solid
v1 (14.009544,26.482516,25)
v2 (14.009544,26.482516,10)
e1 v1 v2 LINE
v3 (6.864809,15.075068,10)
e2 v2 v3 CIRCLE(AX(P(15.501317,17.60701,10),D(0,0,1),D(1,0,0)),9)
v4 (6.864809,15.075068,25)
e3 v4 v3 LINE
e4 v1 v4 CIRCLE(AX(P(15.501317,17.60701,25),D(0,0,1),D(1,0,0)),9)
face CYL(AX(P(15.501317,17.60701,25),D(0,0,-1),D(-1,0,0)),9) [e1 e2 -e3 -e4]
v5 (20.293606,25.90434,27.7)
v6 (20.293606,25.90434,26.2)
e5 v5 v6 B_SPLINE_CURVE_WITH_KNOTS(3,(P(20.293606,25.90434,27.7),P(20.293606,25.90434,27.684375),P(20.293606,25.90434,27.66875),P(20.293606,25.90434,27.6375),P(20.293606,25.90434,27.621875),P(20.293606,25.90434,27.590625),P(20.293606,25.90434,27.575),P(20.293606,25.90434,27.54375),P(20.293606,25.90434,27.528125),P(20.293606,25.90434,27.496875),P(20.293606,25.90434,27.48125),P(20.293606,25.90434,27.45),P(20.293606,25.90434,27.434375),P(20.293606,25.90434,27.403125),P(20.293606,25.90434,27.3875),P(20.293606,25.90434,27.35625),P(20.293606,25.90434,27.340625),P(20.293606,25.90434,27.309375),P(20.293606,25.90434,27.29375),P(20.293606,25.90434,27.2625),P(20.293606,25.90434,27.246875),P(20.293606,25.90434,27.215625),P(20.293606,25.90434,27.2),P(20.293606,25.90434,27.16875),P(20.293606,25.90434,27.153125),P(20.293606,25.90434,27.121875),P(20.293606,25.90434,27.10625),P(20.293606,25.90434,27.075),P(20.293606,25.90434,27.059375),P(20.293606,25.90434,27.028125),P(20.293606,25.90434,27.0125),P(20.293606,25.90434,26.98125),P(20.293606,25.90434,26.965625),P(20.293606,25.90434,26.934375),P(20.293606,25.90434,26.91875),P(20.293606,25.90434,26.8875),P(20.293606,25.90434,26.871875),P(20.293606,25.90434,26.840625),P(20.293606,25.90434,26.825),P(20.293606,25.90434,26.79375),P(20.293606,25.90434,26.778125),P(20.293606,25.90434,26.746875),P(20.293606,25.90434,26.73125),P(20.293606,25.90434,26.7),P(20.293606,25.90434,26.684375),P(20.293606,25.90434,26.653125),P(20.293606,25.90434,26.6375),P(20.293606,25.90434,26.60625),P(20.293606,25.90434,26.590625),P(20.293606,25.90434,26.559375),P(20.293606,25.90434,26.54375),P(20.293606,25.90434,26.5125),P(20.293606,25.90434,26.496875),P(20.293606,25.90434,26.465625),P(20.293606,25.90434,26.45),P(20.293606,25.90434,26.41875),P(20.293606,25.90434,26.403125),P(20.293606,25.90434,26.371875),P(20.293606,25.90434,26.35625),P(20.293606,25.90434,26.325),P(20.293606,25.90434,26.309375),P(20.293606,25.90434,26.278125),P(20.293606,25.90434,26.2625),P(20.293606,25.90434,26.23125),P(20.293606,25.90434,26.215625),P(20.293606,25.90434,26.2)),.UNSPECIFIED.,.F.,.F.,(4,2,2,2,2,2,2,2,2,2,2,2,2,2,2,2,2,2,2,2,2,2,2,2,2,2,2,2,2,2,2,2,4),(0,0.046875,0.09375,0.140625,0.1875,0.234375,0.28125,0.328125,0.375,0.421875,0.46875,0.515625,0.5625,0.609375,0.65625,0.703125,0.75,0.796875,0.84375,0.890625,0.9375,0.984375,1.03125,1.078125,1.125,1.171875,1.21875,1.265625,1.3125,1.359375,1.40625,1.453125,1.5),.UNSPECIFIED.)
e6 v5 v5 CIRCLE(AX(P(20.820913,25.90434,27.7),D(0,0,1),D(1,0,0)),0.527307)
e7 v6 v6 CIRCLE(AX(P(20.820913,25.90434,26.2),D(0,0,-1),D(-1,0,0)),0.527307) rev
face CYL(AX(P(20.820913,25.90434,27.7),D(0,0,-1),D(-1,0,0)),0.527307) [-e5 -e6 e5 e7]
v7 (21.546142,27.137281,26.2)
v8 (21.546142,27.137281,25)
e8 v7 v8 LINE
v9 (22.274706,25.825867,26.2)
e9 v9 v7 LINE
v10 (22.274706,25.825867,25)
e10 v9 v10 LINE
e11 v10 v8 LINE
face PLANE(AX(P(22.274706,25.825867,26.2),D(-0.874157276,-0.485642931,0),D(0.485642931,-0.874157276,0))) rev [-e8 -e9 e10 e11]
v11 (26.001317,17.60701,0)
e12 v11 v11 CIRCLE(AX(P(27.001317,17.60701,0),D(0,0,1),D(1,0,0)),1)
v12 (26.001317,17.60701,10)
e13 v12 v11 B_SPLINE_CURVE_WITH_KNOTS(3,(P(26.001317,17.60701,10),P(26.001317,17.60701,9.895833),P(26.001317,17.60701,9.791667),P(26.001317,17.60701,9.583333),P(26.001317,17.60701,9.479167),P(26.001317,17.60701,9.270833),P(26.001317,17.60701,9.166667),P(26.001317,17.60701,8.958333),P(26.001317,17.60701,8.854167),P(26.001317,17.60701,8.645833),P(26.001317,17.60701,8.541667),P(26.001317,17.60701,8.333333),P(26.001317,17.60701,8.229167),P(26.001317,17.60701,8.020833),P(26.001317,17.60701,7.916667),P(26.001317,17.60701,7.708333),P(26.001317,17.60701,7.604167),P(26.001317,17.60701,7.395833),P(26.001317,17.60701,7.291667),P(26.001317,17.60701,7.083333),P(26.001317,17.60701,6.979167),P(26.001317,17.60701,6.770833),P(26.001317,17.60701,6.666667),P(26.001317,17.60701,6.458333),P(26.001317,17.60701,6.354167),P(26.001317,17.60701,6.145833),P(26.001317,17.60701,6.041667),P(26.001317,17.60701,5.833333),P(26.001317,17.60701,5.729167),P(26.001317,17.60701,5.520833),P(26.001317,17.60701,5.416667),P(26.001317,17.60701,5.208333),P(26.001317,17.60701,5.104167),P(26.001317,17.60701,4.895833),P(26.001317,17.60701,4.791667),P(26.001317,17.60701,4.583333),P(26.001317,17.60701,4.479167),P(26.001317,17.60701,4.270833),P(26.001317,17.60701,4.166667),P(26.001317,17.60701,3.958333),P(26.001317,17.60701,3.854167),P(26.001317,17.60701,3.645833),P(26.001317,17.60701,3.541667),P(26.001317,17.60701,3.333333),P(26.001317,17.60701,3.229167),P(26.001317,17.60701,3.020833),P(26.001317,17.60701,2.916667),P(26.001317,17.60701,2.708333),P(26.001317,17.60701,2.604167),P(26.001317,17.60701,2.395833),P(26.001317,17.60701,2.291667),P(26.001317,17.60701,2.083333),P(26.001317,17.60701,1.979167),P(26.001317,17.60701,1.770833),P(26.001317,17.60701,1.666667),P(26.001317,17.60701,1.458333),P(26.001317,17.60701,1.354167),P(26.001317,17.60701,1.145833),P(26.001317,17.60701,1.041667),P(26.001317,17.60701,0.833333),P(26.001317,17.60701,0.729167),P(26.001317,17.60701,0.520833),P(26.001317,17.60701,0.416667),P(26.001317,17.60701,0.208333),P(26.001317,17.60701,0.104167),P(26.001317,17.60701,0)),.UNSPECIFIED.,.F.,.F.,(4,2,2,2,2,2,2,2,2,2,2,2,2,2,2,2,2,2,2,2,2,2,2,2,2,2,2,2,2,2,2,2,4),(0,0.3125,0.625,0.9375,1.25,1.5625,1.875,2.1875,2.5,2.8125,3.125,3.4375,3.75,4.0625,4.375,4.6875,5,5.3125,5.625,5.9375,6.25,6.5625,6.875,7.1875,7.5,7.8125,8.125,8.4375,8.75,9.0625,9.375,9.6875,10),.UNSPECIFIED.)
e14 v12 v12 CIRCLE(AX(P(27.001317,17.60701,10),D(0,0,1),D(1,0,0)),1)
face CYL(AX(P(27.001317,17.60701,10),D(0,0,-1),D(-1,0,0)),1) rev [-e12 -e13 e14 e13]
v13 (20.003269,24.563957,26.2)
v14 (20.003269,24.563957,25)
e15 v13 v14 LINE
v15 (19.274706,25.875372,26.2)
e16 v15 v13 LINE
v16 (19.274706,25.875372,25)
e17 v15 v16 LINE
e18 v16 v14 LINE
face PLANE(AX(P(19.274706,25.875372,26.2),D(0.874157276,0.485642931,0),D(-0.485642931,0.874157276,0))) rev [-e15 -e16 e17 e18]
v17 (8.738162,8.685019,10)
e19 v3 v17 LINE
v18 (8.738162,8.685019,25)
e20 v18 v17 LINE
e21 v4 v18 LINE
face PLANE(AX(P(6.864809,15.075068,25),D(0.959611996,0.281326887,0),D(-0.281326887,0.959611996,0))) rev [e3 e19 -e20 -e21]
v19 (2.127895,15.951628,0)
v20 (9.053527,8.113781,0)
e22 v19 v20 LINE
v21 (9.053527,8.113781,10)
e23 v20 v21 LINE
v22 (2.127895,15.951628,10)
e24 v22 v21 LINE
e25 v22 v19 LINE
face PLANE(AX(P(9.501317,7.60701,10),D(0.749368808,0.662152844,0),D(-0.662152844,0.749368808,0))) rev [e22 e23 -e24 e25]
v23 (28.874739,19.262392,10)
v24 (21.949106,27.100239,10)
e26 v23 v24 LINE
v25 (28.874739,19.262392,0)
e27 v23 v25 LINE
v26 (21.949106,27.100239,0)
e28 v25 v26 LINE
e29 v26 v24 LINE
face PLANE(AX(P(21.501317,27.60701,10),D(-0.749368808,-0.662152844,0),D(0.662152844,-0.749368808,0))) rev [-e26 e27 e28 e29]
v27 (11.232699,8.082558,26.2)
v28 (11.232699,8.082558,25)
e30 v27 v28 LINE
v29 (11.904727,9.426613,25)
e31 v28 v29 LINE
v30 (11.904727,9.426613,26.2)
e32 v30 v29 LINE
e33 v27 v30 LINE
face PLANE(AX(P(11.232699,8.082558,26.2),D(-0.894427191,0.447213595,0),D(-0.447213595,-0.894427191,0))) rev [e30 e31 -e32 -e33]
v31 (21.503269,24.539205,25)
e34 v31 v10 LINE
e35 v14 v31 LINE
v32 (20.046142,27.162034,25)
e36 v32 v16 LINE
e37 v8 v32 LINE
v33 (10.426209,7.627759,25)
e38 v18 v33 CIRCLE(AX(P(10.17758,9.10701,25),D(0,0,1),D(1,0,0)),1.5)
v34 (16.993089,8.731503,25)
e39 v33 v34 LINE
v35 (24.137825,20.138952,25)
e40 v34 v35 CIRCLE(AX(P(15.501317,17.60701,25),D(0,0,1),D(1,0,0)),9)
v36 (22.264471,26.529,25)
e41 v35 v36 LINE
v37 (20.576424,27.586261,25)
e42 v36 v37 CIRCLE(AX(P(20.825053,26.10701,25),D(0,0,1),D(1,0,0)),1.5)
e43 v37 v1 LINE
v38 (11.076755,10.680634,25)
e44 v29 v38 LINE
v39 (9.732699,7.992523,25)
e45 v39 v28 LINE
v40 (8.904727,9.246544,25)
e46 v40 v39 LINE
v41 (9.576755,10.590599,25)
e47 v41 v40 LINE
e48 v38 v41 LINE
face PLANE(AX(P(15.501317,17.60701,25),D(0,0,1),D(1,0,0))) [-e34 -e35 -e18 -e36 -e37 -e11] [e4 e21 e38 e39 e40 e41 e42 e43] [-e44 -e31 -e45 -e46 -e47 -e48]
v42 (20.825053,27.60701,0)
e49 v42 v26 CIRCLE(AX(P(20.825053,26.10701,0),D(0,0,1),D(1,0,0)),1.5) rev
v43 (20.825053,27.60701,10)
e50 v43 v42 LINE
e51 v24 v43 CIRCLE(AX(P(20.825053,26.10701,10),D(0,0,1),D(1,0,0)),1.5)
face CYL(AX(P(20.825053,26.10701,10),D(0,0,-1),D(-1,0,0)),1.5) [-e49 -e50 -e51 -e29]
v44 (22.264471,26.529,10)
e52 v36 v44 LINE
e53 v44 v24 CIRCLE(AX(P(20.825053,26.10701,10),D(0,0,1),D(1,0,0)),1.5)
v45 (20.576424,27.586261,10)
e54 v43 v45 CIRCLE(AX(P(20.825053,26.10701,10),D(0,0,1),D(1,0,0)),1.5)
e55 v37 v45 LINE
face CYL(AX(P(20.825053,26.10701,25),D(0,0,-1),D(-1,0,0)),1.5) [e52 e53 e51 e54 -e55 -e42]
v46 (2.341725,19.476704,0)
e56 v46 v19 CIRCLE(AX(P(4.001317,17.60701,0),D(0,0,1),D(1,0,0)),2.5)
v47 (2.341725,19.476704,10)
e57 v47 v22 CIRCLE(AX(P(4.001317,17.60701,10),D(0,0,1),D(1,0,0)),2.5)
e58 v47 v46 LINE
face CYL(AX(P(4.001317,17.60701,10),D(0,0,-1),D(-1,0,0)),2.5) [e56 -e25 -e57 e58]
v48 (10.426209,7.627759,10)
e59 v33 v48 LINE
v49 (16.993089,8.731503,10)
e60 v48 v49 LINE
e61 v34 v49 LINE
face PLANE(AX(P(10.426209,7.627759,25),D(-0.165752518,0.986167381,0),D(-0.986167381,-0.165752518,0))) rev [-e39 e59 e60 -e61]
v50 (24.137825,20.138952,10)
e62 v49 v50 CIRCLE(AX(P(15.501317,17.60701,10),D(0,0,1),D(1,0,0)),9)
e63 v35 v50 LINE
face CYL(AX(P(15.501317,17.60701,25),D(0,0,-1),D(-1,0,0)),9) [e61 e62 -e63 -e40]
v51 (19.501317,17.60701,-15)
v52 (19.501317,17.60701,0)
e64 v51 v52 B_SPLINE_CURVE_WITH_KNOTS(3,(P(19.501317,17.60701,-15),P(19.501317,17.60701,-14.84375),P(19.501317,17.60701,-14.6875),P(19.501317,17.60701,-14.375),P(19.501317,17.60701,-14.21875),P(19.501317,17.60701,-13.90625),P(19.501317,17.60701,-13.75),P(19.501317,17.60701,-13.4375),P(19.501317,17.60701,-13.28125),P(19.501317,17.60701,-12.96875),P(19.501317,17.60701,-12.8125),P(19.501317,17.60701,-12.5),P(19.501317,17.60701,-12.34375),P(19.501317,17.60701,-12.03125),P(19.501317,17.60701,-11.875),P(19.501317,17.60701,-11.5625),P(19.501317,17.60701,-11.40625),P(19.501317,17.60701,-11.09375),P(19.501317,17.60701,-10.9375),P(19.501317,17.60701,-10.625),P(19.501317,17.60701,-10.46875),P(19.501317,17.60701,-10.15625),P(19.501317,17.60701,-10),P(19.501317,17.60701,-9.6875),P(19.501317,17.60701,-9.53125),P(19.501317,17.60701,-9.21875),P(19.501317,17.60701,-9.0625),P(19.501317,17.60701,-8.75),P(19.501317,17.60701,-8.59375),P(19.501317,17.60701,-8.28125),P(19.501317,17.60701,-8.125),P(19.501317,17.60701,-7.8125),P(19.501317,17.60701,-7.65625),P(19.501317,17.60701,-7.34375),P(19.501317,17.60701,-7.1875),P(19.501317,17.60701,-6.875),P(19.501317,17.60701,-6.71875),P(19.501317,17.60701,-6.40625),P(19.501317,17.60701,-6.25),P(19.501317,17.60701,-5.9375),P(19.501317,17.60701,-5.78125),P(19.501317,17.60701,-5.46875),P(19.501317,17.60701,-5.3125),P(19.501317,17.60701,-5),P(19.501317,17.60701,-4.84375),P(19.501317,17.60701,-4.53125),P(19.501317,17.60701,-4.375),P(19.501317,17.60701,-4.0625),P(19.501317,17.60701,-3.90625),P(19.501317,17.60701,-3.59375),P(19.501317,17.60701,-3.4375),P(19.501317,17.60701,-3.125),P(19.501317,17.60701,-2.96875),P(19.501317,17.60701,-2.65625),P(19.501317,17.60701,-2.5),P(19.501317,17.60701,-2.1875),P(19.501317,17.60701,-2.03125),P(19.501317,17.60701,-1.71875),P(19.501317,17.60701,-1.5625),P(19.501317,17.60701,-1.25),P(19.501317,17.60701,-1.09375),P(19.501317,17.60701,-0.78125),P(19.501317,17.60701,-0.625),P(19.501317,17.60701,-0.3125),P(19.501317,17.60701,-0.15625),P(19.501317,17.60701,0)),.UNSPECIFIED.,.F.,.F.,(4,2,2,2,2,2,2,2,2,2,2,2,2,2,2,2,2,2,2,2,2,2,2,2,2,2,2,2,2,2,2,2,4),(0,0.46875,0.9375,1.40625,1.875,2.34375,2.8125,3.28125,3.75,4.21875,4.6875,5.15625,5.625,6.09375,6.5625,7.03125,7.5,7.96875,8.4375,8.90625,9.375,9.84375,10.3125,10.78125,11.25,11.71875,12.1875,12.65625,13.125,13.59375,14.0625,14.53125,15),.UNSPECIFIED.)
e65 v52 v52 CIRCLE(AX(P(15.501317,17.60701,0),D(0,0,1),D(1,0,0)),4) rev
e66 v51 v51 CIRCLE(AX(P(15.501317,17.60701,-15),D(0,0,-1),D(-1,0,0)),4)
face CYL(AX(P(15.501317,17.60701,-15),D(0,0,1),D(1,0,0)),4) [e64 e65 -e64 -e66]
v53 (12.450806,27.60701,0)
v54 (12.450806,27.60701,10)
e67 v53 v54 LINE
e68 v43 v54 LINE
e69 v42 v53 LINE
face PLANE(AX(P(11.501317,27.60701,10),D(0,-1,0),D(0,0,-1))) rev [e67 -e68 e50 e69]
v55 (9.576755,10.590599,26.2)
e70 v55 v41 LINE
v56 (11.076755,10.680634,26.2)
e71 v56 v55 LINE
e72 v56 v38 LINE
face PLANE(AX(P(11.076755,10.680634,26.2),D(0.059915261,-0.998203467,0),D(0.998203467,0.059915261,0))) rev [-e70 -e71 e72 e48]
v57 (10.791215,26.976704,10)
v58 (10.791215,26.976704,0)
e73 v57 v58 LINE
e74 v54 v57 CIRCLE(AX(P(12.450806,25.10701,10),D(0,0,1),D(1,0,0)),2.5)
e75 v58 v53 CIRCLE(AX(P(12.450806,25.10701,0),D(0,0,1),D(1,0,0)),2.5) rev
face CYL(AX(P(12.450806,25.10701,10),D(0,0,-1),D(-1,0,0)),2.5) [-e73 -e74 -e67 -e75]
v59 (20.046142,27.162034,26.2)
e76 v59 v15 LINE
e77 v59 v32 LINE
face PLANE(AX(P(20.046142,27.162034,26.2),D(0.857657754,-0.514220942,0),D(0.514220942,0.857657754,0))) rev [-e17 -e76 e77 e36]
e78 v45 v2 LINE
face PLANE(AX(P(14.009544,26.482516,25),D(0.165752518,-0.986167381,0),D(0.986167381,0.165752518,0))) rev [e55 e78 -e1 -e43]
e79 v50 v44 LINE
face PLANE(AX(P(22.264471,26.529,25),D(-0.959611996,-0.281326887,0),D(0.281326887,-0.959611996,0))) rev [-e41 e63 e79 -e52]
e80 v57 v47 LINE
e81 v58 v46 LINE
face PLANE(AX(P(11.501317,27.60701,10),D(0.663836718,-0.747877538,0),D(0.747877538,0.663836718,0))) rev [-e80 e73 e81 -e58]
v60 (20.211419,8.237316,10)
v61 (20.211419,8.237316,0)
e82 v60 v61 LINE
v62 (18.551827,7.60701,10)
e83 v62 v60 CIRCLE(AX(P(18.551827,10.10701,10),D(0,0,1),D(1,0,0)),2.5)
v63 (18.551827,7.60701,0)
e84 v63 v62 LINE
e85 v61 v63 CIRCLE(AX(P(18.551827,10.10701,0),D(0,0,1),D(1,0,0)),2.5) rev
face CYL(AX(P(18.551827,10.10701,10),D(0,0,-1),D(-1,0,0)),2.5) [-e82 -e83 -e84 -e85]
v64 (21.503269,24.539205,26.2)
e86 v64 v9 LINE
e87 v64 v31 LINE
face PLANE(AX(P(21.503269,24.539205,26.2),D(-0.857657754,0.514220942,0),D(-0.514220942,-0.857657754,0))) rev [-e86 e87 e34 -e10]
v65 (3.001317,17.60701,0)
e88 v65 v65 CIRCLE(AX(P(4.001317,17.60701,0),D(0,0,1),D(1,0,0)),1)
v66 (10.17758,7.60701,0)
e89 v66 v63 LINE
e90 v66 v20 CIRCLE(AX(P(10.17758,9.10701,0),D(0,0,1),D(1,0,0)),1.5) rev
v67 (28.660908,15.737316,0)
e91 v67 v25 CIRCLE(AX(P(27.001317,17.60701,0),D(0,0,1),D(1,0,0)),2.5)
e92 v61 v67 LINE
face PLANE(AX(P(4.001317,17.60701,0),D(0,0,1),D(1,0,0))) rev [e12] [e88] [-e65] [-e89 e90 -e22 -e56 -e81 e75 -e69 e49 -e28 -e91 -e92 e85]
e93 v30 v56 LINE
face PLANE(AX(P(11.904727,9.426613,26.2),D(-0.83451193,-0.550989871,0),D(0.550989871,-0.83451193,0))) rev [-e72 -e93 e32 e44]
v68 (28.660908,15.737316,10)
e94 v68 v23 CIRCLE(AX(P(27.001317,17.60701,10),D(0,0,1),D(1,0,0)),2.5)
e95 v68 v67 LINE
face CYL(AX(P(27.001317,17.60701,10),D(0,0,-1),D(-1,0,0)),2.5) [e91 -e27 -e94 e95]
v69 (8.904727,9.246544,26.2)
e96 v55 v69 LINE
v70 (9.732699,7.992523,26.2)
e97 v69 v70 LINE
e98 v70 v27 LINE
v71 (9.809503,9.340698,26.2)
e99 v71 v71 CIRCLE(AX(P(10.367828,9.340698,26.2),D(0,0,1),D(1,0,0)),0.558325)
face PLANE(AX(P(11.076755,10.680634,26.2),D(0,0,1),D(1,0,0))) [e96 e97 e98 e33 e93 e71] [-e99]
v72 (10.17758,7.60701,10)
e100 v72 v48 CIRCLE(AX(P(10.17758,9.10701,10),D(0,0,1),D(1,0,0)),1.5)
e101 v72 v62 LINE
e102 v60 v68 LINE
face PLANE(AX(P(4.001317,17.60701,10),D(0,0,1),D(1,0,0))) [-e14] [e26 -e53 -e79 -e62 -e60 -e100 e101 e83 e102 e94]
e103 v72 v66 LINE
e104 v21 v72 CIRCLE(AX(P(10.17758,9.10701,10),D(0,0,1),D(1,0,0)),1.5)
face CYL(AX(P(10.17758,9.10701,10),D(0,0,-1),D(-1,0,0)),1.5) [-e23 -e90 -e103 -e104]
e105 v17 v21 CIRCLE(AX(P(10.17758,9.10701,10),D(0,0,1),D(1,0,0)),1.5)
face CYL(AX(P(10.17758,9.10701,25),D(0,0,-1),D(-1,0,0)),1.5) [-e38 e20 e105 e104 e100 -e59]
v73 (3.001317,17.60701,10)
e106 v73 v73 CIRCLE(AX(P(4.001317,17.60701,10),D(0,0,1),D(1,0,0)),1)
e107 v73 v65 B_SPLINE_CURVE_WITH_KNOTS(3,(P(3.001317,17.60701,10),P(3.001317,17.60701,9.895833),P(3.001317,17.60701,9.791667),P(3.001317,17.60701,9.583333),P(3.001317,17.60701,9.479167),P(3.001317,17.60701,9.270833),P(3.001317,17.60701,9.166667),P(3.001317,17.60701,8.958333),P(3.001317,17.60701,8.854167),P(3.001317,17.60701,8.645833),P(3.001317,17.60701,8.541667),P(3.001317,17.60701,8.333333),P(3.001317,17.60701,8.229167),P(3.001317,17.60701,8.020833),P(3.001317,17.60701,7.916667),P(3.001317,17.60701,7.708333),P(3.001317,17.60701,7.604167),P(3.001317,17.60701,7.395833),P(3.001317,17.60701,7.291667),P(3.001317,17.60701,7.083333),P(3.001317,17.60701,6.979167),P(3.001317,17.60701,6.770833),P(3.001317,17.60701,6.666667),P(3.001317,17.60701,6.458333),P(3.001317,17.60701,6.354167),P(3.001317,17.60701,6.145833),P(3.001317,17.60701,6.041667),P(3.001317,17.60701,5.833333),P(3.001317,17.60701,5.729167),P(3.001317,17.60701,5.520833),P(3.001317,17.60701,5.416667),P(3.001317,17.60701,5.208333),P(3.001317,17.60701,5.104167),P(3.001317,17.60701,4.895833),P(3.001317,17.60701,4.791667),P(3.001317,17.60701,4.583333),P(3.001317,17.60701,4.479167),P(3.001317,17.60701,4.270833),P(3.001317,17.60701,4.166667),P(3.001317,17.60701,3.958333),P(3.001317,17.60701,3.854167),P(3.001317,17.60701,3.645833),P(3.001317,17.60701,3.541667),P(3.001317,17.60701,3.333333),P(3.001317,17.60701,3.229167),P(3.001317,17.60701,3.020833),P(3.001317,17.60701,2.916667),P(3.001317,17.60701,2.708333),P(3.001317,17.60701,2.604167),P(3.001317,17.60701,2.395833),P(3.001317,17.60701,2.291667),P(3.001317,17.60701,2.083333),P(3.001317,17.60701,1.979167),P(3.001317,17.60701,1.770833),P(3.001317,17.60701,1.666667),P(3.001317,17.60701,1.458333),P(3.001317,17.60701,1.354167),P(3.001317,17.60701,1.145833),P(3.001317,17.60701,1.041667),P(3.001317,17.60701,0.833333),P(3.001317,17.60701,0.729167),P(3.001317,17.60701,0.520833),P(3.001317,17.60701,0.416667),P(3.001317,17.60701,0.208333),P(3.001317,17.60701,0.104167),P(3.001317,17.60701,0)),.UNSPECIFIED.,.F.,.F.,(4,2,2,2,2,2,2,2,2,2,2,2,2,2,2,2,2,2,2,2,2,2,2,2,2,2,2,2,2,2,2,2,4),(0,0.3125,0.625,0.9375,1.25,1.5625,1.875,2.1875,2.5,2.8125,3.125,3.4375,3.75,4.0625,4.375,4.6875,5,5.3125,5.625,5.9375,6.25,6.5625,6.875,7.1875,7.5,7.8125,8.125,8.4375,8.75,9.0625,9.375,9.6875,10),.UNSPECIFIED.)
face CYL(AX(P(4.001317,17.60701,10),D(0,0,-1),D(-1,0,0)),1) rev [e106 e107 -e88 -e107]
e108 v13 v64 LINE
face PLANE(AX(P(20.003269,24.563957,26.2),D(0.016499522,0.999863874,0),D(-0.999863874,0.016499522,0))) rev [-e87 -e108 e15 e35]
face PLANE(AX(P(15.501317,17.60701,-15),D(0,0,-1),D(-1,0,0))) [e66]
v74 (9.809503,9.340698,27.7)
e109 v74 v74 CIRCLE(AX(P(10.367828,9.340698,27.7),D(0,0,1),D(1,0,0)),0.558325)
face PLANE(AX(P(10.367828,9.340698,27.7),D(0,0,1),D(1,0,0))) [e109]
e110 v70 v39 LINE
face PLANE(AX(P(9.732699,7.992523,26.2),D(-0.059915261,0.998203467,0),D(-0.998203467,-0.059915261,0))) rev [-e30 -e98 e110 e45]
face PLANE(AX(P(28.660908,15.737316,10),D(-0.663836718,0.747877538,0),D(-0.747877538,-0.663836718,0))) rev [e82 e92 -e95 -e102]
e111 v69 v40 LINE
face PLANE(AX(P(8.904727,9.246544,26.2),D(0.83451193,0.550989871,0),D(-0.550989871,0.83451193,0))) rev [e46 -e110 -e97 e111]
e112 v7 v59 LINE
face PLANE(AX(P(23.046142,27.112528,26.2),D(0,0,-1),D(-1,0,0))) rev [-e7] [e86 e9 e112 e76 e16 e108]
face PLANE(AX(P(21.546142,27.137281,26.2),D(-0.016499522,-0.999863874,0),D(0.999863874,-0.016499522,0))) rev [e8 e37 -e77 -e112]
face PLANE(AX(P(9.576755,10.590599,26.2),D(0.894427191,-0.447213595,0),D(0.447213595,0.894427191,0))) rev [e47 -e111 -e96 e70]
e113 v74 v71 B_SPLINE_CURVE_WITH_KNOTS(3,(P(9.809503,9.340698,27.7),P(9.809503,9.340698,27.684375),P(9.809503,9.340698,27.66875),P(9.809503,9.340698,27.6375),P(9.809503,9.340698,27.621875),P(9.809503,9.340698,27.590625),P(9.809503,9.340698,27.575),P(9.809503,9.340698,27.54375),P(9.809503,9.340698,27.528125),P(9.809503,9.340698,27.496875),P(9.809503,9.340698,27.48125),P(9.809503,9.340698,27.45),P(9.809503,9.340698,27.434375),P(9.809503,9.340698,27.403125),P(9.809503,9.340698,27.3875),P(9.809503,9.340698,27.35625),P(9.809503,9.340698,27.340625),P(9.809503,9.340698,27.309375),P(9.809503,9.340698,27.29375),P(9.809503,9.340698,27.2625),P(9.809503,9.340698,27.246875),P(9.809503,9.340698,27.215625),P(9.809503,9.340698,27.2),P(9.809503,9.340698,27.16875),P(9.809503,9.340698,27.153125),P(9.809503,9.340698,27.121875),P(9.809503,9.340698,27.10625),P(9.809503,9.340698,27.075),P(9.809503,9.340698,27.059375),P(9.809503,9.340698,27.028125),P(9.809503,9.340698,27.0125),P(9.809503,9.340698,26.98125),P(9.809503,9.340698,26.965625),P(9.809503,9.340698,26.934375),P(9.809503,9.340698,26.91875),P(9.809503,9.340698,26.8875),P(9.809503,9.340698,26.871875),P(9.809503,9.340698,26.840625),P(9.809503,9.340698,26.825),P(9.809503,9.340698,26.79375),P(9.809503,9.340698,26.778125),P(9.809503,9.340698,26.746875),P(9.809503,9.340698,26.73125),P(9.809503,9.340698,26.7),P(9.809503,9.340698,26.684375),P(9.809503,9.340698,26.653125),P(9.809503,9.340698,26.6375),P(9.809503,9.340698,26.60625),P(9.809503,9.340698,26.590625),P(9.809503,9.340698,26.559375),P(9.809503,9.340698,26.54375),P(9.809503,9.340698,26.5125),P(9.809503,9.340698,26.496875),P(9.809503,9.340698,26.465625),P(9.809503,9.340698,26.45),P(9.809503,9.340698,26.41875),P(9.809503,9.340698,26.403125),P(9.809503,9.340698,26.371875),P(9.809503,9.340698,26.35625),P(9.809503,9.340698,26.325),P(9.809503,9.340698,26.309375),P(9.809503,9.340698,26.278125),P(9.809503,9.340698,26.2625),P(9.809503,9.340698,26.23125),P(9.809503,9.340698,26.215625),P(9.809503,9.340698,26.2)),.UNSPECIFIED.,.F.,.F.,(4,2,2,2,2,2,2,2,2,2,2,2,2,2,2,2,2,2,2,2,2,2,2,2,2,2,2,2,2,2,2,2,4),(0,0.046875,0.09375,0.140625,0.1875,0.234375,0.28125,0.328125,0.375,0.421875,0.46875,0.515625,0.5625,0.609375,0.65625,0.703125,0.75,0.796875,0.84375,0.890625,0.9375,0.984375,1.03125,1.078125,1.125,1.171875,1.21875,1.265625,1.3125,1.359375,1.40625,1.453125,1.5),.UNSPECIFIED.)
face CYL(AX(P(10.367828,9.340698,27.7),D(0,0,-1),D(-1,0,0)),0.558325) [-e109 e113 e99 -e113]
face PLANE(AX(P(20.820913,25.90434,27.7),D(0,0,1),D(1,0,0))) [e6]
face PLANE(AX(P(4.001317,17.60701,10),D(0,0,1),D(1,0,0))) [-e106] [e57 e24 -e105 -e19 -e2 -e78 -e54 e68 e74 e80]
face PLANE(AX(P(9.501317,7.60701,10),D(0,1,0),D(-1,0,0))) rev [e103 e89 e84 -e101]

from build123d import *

# Parameters (mm, degrees)
SKETCH_1_R      = 1
EXTRUDE_1_DEPTH = 10
EXTRUDE_2_DEPTH = 15
SKETCH_3_R      = 4
EXTRUDE_3_DEPTH = 15
FILLET_1_R      = 1.5
FILLET_2_R      = 2.5
EXTRUDE_4_DEPTH = 1.2
SKETCH_9_R      = 0.527306968
EXTRUDE_5_DEPTH = 1.5
SKETCH_10_R     = 0.558325025
EXTRUDE_6_DEPTH = 1.5


with BuildPart() as part:
    # Эскиз1 → Вытянуть1 (new body)
    with BuildSketch(Plane.XY):
        with BuildLine():
            Line((9.501316689, 7.607009807), (19.501316689, 7.607009807))
            Line((19.501316689, 7.607009807), (28.660908483, 15.737315961))
            ThreePointArc((28.660908483, 15.737315961), (29.496729836, 17.455638669), (28.874738709, 19.262391918))
            Line((28.874738709, 19.262391918), (21.501316689, 27.607009807))
            Line((21.501316689, 27.607009807), (11.501316689, 27.607009807))
            Line((11.501316689, 27.607009807), (2.341724894, 19.476703653))
            ThreePointArc((2.341724894, 19.476703653), (1.505903541, 17.758380944), (2.127894668, 15.951627696))
            Line((2.127894668, 15.951627696), (9.501316689, 7.607009807))
        make_face()
        with Locations(Location((27.001316689, 17.607009807, 0), (0, 0, 180))):
            Circle(SKETCH_1_R, mode=Mode.SUBTRACT)
        with Locations(Location((4.001316689, 17.607009807, 0), (0, 0, 180))):
            Circle(SKETCH_1_R, mode=Mode.SUBTRACT)
    extrude(amount=EXTRUDE_1_DEPTH)

    # Эскиз2 → Вытянуть2 (add)
    with BuildSketch(Plane.XY.offset(10)):
        with BuildLine():
            Line((22.264471235, 26.529000138), (24.137824651, 20.138951792))
            ThreePointArc((24.137824651, 20.138951792), (23.128766256, 12.82977074), (16.993089347, 8.73150338))
            Line((16.993089347, 8.73150338), (10.426208912, 7.627758736))
            ThreePointArc((10.426208912, 7.627758736), (9.381373625, 7.835768212), (8.738162142, 8.685019476))
            Line((8.738162142, 8.685019476), (6.864808726, 15.075067822))
            ThreePointArc((6.864808726, 15.075067822), (7.873867121, 22.384248873), (14.00954403, 26.482516234))
            Line((14.00954403, 26.482516234), (20.576424465, 27.586260878))
            ThreePointArc((20.576424465, 27.586260878), (21.621259753, 27.378251401), (22.264471235, 26.529000138))
        make_face()
    extrude(amount=EXTRUDE_2_DEPTH)

    # Эскиз3 → Вытянуть3 (add)
    with BuildSketch(Plane(origin=(0, 0, 0), x_dir=(-1, 0, 0), z_dir=(0, 0, -1))):
        with Locations(Location((-15.501316689, 17.607009807, 0), (0, 0, 180))):
            Circle(SKETCH_3_R)
    extrude(amount=EXTRUDE_3_DEPTH)

    # Скругление1
    fillet_1_edges = [part.edges().sort_by_distance(p)[0] for p in [
        (9.501316689, 7.607009807, 5),
        (21.501316689, 27.607009807, 5),
    ]]
    fillet(fillet_1_edges, radius=FILLET_1_R - 0.0001)  # a hair under: the kernel refuses the full size

    # Скругление2
    fillet_2_edges = [part.edges().sort_by_distance(p)[0] for p in [
        (19.501316689, 7.607009807, 5),
        (11.501316689, 27.607009807, 5),
    ]]
    fillet(fillet_2_edges, radius=FILLET_2_R)

    # Эскиз8 → Вытянуть4 (add)
    with BuildSketch(Plane.XY.offset(25)):
        Polygon((20.046142028, 27.162033609), (19.274705601, 25.87537183), (20.003269175, 24.563957398), (21.503269175, 24.539204745), (22.274705601, 25.825866524), (21.546142028, 27.137280956), align=None)
        Polygon((11.07675483, 10.680633722), (9.57675483, 10.59059908), (8.904727117, 9.246543654), (9.732699404, 7.992522869), (11.232699404, 8.082557511), (11.904727117, 9.426612937), align=None)
    extrude(amount=EXTRUDE_4_DEPTH)

    # Эскиз9 → Вытянуть5 (add)
    with BuildSketch(Plane.XY.offset(26.2)):
        with Locations(Location((20.820913454, 25.904340038, 0), (0, 0, 180))):
            Circle(SKETCH_9_R)
    extrude(amount=EXTRUDE_5_DEPTH)

    # Эскиз10 → Вытянуть6 (add)
    with BuildSketch(Plane.XY.offset(26.2)):
        with Locations(Location((10.367828265, 9.340697632, 0), (0, 0, 180))):
            Circle(SKETCH_10_R)
    extrude(amount=EXTRUDE_6_DEPTH)


solid = part.part
